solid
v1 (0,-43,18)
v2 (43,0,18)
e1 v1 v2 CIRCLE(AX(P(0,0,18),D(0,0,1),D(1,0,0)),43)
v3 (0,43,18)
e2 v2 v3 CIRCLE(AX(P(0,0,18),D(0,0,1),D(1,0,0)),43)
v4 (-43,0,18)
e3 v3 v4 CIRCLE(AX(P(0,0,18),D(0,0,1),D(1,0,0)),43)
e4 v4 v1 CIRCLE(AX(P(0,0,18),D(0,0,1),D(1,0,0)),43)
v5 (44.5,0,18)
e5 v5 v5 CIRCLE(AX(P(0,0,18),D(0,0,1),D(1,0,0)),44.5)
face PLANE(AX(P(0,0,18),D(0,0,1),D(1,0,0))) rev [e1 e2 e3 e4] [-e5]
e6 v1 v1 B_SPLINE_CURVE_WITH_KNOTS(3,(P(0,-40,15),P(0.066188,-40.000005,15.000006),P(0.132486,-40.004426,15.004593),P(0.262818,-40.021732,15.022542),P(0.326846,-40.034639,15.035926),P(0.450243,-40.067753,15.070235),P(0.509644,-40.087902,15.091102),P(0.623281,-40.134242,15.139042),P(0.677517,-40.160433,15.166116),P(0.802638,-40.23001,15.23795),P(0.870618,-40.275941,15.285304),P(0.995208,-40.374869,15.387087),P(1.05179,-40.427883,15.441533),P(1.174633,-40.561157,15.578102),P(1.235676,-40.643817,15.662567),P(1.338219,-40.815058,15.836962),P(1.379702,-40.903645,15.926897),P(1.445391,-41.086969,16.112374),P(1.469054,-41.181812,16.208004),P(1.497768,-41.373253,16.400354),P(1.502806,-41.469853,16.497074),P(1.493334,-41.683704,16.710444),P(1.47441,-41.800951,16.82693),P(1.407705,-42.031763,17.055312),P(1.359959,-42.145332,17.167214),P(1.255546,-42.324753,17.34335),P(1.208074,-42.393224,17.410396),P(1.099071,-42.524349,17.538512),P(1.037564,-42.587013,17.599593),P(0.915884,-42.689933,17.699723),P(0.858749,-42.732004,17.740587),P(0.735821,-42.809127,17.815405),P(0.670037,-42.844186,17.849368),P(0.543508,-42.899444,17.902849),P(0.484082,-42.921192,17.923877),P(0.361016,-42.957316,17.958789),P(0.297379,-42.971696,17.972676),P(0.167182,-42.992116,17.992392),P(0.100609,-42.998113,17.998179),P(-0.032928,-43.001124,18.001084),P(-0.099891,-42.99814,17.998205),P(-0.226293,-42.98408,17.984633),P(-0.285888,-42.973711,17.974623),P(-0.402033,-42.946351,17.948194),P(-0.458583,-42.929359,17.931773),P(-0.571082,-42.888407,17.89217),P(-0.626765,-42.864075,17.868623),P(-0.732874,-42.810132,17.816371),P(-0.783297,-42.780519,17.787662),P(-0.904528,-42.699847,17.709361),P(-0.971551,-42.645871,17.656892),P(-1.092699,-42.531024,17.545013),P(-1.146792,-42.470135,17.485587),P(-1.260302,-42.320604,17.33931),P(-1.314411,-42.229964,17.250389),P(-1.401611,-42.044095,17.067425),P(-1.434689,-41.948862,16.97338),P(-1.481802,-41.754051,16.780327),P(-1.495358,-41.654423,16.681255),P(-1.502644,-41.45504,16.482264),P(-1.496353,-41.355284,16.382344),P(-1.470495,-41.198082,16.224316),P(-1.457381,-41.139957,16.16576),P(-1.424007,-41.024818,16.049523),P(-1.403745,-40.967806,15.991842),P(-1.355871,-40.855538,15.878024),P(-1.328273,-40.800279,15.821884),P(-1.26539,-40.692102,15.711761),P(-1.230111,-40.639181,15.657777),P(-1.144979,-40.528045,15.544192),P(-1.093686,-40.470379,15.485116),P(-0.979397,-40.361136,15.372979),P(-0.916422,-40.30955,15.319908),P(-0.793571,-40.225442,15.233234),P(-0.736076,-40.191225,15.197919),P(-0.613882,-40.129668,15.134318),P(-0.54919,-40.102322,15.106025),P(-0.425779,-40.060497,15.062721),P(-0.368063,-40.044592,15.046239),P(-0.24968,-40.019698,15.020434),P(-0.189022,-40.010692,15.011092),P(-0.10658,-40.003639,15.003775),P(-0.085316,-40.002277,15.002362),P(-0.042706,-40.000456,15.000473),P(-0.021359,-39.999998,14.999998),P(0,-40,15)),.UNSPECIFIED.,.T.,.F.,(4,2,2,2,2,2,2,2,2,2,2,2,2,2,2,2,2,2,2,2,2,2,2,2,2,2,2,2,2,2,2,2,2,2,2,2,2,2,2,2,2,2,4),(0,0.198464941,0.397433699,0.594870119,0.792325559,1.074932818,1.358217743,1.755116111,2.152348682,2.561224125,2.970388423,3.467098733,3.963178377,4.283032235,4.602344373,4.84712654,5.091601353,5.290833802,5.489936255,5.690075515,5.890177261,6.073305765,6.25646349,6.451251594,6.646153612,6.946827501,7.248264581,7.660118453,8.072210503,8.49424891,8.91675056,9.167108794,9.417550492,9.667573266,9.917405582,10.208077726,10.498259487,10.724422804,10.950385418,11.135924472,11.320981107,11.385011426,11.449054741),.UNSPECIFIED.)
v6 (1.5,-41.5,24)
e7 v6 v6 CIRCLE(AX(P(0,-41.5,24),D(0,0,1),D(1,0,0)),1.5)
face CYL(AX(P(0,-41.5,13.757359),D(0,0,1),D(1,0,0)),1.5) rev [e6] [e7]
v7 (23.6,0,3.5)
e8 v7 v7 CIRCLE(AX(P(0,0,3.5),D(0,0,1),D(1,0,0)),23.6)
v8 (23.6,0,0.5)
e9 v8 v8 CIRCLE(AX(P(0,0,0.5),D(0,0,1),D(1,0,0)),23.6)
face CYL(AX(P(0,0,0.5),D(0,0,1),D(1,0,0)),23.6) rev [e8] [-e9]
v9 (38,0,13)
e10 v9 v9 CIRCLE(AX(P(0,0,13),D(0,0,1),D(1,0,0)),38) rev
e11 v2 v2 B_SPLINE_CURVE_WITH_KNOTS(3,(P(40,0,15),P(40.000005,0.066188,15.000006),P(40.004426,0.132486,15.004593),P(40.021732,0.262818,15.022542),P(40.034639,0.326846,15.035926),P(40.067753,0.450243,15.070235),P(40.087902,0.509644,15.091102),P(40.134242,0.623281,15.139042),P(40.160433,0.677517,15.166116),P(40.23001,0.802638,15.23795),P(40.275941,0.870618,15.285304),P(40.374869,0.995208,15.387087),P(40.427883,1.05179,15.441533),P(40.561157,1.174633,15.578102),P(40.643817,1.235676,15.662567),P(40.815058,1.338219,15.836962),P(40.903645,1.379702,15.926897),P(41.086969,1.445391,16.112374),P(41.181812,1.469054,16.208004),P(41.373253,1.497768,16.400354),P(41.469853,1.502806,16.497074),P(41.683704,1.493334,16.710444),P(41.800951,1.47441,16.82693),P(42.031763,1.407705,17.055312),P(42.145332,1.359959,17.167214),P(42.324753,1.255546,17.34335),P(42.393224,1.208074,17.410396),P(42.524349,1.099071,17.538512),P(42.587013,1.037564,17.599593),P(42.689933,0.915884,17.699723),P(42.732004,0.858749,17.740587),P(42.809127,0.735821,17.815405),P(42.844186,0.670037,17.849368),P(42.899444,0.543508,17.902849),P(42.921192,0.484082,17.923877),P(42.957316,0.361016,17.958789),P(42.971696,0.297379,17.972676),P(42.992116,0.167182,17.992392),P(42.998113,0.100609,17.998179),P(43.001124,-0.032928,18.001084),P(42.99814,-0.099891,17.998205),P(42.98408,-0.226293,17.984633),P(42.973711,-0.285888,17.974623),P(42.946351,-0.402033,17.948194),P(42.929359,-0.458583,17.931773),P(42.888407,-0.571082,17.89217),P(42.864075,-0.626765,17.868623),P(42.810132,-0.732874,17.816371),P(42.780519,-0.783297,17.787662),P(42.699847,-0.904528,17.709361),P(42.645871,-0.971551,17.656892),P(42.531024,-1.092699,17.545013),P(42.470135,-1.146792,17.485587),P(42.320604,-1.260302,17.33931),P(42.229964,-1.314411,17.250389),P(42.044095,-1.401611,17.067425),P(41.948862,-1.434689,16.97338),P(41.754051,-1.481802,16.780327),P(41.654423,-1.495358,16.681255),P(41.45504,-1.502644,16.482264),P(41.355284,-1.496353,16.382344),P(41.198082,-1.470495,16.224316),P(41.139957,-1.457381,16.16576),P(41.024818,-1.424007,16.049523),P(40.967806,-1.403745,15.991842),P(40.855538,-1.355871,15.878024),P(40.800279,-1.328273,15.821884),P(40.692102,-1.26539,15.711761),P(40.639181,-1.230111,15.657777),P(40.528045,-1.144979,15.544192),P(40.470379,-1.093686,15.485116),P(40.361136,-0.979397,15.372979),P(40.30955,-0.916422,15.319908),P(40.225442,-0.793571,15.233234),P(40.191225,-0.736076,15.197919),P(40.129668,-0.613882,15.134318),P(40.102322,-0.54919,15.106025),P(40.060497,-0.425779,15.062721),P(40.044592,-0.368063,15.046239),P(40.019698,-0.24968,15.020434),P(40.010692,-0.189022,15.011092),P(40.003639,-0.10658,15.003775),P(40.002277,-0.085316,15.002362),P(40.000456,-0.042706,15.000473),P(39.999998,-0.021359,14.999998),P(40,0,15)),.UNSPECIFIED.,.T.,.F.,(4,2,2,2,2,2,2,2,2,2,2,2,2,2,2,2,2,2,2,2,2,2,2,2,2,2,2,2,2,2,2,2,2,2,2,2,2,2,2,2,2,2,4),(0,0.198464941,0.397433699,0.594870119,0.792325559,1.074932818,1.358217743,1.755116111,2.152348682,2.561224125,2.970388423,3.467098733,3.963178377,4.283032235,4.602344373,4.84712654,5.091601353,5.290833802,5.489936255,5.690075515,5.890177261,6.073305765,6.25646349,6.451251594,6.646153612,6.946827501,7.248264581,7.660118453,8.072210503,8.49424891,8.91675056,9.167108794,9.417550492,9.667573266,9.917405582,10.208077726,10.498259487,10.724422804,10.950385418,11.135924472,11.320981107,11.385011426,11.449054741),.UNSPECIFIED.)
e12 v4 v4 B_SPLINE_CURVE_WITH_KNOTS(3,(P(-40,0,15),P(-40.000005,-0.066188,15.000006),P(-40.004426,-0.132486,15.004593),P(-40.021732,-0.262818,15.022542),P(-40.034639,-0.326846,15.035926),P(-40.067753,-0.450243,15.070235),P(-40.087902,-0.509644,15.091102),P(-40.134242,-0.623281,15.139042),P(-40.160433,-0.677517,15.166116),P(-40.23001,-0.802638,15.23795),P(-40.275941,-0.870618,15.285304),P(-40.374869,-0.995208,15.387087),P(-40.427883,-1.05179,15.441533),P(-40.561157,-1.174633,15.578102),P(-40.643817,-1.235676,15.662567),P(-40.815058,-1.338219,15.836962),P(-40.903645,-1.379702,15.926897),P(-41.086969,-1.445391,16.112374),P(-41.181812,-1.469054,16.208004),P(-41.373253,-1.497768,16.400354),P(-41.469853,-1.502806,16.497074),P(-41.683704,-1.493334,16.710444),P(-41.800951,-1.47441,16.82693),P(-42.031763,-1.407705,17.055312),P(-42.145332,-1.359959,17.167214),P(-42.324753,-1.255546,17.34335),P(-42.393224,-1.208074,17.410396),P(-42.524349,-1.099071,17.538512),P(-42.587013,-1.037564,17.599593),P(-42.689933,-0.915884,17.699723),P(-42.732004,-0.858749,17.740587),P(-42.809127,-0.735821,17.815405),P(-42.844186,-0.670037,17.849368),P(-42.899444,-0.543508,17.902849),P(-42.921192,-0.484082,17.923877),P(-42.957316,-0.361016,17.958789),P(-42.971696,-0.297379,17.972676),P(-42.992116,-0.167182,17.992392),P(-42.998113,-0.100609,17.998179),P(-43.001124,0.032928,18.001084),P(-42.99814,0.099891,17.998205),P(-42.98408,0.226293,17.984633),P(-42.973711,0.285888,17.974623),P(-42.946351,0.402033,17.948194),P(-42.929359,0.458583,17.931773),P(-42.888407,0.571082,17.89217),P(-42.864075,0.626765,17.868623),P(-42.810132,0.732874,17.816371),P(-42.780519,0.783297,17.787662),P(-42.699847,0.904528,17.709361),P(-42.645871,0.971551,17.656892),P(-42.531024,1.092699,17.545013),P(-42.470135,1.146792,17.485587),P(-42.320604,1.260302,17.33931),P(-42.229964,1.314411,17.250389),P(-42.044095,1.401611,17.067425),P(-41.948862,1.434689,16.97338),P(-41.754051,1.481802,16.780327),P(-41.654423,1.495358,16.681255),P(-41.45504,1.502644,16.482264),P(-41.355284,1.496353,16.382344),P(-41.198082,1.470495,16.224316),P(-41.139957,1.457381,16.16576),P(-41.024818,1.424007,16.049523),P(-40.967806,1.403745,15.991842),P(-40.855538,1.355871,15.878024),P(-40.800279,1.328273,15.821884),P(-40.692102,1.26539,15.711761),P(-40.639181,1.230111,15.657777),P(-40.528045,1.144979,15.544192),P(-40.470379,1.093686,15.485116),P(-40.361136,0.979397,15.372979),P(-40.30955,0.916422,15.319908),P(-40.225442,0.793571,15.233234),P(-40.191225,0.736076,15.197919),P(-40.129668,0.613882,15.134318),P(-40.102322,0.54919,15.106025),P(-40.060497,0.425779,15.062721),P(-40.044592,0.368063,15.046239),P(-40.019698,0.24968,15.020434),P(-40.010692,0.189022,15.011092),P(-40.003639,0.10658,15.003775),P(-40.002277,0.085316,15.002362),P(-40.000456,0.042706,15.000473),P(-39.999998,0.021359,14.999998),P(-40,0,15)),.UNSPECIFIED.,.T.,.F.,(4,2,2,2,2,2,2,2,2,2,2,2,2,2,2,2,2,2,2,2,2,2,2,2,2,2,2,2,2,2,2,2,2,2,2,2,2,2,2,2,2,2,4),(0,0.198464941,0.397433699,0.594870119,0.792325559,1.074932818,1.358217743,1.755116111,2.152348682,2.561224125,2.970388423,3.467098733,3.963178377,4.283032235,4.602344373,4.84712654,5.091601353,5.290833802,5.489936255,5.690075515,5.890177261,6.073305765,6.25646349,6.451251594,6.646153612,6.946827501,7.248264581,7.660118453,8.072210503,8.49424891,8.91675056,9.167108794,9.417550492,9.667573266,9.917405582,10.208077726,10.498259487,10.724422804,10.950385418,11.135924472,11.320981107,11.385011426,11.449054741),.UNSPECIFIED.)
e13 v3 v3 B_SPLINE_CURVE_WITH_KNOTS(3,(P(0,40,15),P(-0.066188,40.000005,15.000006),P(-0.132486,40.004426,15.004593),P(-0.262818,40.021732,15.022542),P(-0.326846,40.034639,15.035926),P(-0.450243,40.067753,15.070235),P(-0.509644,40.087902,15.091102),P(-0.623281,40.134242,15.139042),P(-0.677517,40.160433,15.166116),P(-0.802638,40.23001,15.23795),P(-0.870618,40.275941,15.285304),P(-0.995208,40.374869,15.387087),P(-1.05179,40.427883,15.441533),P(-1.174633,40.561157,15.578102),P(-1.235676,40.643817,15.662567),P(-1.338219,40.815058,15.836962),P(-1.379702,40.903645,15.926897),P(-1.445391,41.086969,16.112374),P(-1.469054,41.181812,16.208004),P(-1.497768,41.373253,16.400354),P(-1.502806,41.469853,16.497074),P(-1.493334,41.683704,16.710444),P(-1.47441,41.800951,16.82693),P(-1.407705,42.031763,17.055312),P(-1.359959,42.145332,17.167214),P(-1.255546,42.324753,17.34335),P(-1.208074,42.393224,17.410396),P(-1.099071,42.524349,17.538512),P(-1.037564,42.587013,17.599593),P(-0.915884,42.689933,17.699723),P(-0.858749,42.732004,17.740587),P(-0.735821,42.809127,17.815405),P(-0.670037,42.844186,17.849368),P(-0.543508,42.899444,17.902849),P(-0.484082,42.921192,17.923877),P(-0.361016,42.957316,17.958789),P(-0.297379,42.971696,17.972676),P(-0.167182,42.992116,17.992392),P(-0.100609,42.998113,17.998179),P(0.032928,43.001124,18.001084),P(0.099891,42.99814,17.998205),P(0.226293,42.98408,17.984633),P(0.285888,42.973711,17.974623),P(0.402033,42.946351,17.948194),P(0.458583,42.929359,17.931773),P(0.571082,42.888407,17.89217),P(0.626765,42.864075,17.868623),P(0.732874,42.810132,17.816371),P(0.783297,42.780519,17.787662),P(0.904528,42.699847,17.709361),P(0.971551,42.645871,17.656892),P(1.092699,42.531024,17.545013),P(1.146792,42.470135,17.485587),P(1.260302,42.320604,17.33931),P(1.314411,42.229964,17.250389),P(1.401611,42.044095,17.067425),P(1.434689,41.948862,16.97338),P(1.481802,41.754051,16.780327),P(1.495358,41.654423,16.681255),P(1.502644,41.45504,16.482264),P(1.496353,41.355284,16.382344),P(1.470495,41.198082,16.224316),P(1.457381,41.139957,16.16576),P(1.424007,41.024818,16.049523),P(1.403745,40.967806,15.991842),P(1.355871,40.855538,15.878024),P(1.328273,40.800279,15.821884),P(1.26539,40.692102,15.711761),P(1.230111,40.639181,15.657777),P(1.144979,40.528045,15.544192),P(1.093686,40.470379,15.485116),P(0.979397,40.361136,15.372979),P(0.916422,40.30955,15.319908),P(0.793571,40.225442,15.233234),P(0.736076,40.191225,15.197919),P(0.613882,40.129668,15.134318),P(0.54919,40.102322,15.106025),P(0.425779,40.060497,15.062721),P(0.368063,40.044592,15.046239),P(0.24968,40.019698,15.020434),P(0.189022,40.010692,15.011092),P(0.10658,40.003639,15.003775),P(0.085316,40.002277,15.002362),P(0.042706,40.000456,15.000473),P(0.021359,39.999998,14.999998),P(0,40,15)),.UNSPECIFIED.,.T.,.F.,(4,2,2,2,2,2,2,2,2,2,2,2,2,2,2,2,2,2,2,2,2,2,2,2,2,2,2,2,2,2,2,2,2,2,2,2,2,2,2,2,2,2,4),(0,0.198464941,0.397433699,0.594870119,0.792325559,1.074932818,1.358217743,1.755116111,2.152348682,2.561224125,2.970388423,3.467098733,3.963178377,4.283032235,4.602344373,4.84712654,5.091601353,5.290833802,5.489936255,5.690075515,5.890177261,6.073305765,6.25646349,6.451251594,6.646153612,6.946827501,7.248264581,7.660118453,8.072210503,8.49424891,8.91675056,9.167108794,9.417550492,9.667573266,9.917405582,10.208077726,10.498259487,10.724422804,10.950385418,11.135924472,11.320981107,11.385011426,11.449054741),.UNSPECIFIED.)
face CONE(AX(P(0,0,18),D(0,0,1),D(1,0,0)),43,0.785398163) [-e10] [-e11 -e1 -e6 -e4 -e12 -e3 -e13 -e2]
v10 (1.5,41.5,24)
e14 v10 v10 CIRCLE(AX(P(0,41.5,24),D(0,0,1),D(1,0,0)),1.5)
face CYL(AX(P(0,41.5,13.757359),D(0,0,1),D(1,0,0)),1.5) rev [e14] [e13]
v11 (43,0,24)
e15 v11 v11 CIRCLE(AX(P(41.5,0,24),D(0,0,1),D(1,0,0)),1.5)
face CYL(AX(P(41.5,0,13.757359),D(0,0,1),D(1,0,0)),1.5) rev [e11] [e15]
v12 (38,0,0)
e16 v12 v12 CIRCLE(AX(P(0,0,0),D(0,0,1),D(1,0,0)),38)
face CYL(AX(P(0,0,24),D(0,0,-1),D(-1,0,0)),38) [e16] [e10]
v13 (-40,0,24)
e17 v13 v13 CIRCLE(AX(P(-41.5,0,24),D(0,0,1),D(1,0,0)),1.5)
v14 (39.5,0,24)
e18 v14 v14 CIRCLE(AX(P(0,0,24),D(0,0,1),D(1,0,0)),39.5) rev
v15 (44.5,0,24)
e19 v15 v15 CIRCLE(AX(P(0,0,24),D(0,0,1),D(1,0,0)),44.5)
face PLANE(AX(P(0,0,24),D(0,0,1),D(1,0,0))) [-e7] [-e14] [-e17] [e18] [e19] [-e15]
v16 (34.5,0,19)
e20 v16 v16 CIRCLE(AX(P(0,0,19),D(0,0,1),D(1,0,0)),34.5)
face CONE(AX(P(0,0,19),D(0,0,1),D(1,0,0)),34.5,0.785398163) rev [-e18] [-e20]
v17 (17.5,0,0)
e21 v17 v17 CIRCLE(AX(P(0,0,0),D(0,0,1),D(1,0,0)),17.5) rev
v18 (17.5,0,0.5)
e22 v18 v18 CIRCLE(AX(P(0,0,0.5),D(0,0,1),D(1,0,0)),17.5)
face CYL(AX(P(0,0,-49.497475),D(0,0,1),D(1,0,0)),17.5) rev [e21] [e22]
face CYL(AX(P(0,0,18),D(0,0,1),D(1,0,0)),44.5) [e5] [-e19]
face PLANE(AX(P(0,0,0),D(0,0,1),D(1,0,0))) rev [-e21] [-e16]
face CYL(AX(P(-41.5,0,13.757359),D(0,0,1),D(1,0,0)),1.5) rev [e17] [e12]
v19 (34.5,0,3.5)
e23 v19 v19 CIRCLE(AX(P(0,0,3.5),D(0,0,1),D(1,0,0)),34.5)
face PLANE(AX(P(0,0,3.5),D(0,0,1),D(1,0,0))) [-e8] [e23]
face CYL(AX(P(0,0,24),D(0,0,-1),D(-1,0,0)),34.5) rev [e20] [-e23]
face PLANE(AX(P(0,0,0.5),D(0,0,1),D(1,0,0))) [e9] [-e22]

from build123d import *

# Parameters (mm, degrees)
SKETCH1_R           = 38
BOSS_EXTRUDE1_DEPTH = 24
SHELL1_T            = -3.5
SKETCH2_R           = 23.6
CUT_EXTRUDE1_DEPTH  = 3
SKETCH3_R           = 17.5
CUT_EXTRUDE2_DEPTH  = 0.5
BOSS_EXTRUDE2_START = -6
SKETCH4_R           = 44.5
SKETCH4_R_2         = 38
BOSS_EXTRUDE2_DEPTH = 6
SKETCH5_R           = 1.5
CUT_EXTRUDE3_DEPTH  = 6
CHAMFER1_SIZE       = 5


with BuildPart() as part:
    # Sketch1 → Boss-Extrude1 (new body)
    with BuildSketch(Plane.XY):
        Circle(SKETCH1_R)
    extrude(amount=BOSS_EXTRUDE1_DEPTH)

    # Shell1
    shell1_openings = [part.faces().sort_by_distance(p)[0] for p in [
        (0, 0, 24),
    ]]
    offset(amount=SHELL1_T, openings=shell1_openings, kind=Kind.INTERSECTION)

    # Sketch2 → Cut-Extrude1 (cut)
    with BuildSketch(Plane.XY.offset(3.5)):
        Circle(SKETCH2_R)
    extrude(amount=-CUT_EXTRUDE1_DEPTH, mode=Mode.SUBTRACT)

    # Sketch3 → Cut-Extrude2 (cut)
    with BuildSketch(Plane.XY.offset(0.5)):
        Circle(SKETCH3_R)
    extrude(amount=-CUT_EXTRUDE2_DEPTH, mode=Mode.SUBTRACT)

    # Sketch4 → Boss-Extrude2 (add)
    with BuildSketch(Plane.XY.offset(24).offset(BOSS_EXTRUDE2_START)):
        Circle(SKETCH4_R)
        Circle(SKETCH4_R_2, mode=Mode.SUBTRACT)
    extrude(amount=BOSS_EXTRUDE2_DEPTH)

    # Sketch5 → Cut-Extrude3 (cut)
    with BuildSketch(Plane.XY.offset(24)):
        with Locations((0, -41.5)):
            Circle(SKETCH5_R)
        with Locations((-41.5, 0)):
            Circle(SKETCH5_R)
        with Locations((0, 41.5)):
            Circle(SKETCH5_R)
        with Locations((41.5, 0)):
            Circle(SKETCH5_R)
    extrude(amount=-CUT_EXTRUDE3_DEPTH, mode=Mode.SUBTRACT)

    # Chamfer1
    chamfer1_edges = [part.edges().sort_by_distance(p)[0] for p in [
        (-34.5, 0, 24),
    ]]
    chamfer(chamfer1_edges, length=CHAMFER1_SIZE)

    # Chamfer2
    # the kernel refuses this chamfer: 5 mm, written as the material it adds along each edge
    with BuildSketch(Plane(origin=(0, 0, 18), x_dir=(1, 0, 0), z_dir=(0, -1, 0))) as chamfer2_piece_1_section:
        with BuildLine():
            Line((43.141421356, 0.141421356), (37.858578644, -5.141421356))
            Line((37.858578644, -5.141421356), (37.758578644, -5.141421356))
            ThreePointArc((37.758578644, -5.141421356), (37.9, -2.570710678), (37.9, 0))
            Line((37.9, 0), (38, 0.1))
            ThreePointArc((38, 0.1), (40.570710678, 0.1), (43.141421356, 0.241421356))
            Line((43.141421356, 0.241421356), (43.141421356, 0.141421356))
        make_face()
    chamfer2_piece_1 = revolve(axis=Axis((0, 0, 18), (0, 0, 1)), mode=Mode.PRIVATE)
    chamfer2_piece_1 = chamfer2_piece_1 - Plane(origin=(0, -41.5, 17.367076612), x_dir=(1, 0, 0), z_dir=(0, 0, 1)) * Cylinder(1.5, 173, mode=Mode.PRIVATE)
    chamfer2_piece_1 = chamfer2_piece_1 - Plane(origin=(41.5, 0, 17.367076612), x_dir=(1, 0, 0), z_dir=(0, 0, 1)) * Cylinder(1.5, 173, mode=Mode.PRIVATE)
    chamfer2_piece_1 = chamfer2_piece_1 - Plane(origin=(-41.5, 0, 17.367076612), x_dir=(1, 0, 0), z_dir=(0, 0, 1)) * Cylinder(1.5, 173, mode=Mode.PRIVATE)
    chamfer2_piece_1 = chamfer2_piece_1 - Plane(origin=(0, 41.5, 17.367076612), x_dir=(1, 0, 0), z_dir=(0, 0, 1)) * Cylinder(1.5, 173, mode=Mode.PRIVATE)
    add(chamfer2_piece_1)


solid = part.part
